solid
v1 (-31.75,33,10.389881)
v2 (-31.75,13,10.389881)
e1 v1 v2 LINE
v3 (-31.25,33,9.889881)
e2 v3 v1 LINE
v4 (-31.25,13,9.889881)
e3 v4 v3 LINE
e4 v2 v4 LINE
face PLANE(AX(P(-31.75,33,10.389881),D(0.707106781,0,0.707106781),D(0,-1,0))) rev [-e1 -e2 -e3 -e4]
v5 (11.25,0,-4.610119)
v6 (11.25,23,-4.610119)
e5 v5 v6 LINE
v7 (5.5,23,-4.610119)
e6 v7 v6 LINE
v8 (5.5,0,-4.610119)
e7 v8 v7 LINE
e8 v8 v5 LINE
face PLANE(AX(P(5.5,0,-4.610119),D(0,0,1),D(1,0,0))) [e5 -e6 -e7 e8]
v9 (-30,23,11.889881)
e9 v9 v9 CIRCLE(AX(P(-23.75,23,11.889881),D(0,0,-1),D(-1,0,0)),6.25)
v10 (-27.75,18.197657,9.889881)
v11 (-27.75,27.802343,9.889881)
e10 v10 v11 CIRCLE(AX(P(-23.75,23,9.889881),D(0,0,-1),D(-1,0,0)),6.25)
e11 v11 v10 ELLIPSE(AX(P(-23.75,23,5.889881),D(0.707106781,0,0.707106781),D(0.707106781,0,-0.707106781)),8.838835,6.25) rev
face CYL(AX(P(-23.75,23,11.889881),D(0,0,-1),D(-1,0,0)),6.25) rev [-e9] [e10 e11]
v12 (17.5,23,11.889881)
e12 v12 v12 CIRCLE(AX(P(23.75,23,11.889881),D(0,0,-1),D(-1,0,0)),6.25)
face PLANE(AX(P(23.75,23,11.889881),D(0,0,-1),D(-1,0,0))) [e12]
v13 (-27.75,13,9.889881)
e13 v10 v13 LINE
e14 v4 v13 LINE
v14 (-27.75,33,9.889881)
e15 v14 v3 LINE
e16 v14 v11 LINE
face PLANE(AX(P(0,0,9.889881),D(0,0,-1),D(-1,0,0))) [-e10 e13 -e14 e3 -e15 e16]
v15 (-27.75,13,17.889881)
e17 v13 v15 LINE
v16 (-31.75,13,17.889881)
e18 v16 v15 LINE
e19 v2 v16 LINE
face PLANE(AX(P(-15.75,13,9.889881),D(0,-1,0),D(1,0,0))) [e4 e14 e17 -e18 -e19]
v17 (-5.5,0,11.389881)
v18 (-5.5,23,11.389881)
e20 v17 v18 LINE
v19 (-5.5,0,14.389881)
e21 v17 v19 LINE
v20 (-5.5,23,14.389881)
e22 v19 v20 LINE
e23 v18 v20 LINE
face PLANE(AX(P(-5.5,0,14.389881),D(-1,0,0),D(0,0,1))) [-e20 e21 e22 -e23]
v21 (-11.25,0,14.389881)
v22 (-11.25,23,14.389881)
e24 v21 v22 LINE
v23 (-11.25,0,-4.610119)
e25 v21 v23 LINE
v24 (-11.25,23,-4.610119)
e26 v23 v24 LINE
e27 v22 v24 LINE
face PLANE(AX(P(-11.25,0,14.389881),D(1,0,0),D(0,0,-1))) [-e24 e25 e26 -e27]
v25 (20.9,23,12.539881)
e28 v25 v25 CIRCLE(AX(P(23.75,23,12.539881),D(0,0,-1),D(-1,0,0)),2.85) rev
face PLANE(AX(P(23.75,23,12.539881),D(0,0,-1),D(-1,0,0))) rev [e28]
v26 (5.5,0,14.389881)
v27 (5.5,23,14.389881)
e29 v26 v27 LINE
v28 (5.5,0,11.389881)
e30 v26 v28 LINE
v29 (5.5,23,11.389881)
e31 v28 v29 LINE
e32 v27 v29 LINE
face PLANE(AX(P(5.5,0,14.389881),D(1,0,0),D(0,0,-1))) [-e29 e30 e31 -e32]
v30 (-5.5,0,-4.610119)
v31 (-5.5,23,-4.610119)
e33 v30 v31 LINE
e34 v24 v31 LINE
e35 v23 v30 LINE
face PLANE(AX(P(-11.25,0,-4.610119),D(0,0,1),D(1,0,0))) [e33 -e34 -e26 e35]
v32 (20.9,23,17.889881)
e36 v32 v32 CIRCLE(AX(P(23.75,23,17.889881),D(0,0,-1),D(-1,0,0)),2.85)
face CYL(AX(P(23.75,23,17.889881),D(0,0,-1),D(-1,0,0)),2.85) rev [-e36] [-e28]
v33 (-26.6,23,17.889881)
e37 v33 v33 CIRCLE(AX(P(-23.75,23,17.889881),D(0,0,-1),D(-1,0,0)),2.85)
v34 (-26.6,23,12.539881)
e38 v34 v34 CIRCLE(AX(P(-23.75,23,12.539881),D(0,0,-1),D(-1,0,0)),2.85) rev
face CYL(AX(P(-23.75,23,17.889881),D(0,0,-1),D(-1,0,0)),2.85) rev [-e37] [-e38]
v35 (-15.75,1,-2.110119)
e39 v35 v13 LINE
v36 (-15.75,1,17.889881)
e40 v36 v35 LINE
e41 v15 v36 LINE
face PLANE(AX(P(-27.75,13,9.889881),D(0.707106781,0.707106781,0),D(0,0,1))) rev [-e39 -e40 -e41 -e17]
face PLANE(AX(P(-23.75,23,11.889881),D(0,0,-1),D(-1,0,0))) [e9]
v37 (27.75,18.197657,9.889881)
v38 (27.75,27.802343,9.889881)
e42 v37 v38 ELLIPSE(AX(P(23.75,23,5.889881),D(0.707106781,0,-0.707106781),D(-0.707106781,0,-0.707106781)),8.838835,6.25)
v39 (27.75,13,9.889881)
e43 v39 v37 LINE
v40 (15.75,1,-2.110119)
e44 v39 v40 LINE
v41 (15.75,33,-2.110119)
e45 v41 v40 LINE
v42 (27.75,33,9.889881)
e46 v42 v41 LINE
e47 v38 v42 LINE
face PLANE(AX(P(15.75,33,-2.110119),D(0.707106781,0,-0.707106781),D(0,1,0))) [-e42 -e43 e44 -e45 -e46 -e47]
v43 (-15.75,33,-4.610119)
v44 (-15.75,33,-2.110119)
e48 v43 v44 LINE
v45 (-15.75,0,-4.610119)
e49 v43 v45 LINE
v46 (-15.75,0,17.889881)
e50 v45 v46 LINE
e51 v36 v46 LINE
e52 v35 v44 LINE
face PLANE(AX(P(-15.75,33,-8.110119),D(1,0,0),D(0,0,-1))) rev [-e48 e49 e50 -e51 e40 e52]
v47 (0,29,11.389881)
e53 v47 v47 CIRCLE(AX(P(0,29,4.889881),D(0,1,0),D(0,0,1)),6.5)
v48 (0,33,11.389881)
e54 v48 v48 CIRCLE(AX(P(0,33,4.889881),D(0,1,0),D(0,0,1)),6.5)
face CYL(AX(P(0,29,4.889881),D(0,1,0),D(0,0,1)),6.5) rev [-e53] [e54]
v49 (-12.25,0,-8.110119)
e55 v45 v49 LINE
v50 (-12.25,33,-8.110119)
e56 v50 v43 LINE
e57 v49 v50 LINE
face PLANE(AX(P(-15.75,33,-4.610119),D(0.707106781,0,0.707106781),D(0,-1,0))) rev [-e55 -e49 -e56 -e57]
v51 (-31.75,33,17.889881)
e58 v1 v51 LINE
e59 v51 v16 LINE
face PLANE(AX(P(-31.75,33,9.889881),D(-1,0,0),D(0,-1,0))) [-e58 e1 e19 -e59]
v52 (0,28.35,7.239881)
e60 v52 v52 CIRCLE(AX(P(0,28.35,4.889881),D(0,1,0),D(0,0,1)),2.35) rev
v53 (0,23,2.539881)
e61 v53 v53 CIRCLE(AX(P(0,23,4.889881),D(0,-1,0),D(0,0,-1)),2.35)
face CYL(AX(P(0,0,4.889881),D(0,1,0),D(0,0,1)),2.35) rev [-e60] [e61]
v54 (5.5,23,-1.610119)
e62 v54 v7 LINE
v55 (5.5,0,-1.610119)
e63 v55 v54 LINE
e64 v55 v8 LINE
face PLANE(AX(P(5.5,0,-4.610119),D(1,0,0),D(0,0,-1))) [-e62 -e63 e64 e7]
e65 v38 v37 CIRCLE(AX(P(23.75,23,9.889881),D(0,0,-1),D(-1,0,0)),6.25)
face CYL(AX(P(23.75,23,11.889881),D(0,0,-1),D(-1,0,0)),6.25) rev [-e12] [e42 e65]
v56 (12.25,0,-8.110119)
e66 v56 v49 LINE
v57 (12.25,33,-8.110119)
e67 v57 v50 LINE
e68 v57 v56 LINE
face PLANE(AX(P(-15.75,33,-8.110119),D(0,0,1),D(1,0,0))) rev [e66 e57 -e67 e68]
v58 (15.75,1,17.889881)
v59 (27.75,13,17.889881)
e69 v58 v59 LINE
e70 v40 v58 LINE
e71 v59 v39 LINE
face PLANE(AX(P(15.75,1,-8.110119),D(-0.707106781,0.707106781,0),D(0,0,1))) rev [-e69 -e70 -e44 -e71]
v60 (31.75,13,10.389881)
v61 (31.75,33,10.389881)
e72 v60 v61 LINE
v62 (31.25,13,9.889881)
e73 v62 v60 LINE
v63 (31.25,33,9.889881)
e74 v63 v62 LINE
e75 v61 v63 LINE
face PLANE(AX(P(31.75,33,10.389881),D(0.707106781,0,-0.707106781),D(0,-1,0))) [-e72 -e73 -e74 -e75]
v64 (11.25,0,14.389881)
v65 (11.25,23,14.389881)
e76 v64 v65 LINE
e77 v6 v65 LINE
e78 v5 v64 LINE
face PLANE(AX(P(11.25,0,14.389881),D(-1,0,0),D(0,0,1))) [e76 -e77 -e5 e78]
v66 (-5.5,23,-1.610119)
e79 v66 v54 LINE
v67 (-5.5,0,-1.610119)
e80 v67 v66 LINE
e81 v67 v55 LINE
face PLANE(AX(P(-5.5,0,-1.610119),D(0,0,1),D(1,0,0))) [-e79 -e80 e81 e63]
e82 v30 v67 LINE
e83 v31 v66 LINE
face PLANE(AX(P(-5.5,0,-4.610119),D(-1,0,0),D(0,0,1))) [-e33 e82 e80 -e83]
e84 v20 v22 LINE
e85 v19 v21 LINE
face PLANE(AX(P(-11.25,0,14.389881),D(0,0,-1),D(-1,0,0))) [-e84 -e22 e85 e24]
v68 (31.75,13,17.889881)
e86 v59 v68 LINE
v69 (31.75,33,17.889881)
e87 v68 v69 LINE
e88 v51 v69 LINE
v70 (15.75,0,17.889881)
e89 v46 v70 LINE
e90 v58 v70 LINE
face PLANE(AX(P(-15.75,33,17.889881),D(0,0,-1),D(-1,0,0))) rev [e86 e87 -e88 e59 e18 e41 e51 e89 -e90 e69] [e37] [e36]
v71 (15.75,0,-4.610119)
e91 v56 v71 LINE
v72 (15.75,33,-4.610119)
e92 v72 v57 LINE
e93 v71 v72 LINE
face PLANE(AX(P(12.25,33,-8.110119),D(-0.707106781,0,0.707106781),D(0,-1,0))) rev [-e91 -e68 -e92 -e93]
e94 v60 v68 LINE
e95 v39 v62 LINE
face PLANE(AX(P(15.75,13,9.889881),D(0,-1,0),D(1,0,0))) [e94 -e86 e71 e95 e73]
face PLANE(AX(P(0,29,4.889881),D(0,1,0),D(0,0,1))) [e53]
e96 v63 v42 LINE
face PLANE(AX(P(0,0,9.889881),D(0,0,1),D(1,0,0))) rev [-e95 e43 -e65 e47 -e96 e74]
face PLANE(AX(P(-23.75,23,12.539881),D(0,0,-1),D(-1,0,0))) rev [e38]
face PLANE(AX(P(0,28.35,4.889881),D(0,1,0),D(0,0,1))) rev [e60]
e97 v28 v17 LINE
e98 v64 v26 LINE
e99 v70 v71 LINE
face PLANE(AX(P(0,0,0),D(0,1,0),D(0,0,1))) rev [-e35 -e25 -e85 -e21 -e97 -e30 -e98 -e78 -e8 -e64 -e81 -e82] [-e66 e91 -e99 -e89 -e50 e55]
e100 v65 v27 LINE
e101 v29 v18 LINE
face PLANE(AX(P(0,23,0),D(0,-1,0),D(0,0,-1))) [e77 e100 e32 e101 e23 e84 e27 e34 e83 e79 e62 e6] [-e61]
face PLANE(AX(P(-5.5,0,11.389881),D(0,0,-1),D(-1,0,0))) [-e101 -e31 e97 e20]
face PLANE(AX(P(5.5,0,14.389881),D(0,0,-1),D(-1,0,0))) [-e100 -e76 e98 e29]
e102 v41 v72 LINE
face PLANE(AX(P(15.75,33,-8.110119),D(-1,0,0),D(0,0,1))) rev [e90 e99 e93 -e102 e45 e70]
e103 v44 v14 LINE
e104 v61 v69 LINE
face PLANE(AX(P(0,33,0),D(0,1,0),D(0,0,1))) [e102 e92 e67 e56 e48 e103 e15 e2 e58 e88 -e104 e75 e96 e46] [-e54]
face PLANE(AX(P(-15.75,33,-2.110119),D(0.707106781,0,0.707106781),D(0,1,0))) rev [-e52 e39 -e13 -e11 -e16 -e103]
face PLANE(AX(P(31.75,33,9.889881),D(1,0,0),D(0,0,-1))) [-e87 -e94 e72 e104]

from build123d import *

# Parameters (mm, degrees)
SKETCH1_W           = 31.5
SKETCH1_H           = 26
BOSS_EXTRUDE1_DEPTH = 33
SKETCH8_W           = 16
SKETCH8_H           = 20
BOSS_EXTRUDE2_DEPTH = 8
CUT_EXTRUDE1_START  = 10
CUT_EXTRUDE1_DEPTH  = 40.164116391
SKETCH3_R           = 2.85
CUT_EXTRUDE2_DEPTH  = 50.204293512
SKETCH6_R           = 6.25
CUT_EXTRUDE5_DEPTH  = 2
SKETCH4_R           = 2.35
CUT_EXTRUDE3_DEPTH  = 50.164116391
SKETCH5_R           = 6.5
CUT_EXTRUDE4_DEPTH  = 4
CHAMFER1_SIZE       = 3.5
CHAMFER3_SIZE       = 0.5
CHAMFER4_SIZE       = 12
CHAMFER5_SIZE       = 12
SKETCH10_R          = 4.428091906
BOSS_EXTRUDE4_DEPTH = 0.65
SKETCH11_R          = 4.527005536
SKETCH11_R_2        = 4.450513295
BOSS_EXTRUDE5_DEPTH = 0.65


with BuildPart() as part:
    # Sketch1 → Boss-Extrude1 (new body)
    with BuildSketch(Plane(origin=(0, 0, 0), x_dir=(1, 0, 0), z_dir=(0, 1, 0))):
        with Locations((0, -4.889880952)):
            Rectangle(SKETCH1_W, SKETCH1_H)
    extrude(amount=BOSS_EXTRUDE1_DEPTH)

    # Sketch8 → Boss-Extrude2 (add)
    with BuildSketch(Plane.XY.offset(17.889880952)):
        with Locations((23.75, 23)):
            Rectangle(SKETCH8_W, SKETCH8_H)
        with Locations((-23.75, 23)):
            Rectangle(SKETCH8_W, SKETCH8_H)
    extrude(amount=-BOSS_EXTRUDE2_DEPTH)

    # Sketch2 → Cut-Extrude1 (cut, through all)
    with BuildSketch(Plane.XZ.offset(-33).offset(CUT_EXTRUDE1_START)):
        Polygon((-11.25, 14.389880952), (-5.5, 14.389880952), (-5.5, 11.389880952), (5.5, 11.389880952), (5.5, 14.389880952), (11.25, 14.389880952), (11.25, -4.610119048), (5.5, -4.610119048), (5.5, -1.610119048), (-5.5, -1.610119048), (-5.5, -4.610119048), (-11.25, -4.610119048), align=None)
    extrude(amount=CUT_EXTRUDE1_DEPTH, mode=Mode.SUBTRACT)

    # Sketch3 → Cut-Extrude2 (cut, through all)
    with BuildSketch(Plane(origin=(0, 0, 9.889880952), x_dir=(-1, 0, 0), z_dir=(0, 0, -1))):
        with Locations((-23.75, 23)):
            Circle(SKETCH3_R)
        with Locations((23.75, 23)):
            Circle(SKETCH3_R)
    extrude(amount=-CUT_EXTRUDE2_DEPTH, mode=Mode.SUBTRACT)

    # Sketch6 → Cut-Extrude5 (cut)
    with BuildSketch(Plane(origin=(0, 0, 9.889880952), x_dir=(-1, 0, 0), z_dir=(0, 0, -1))):
        with Locations((-23.75, 23)):
            Circle(SKETCH6_R)
        with Locations((23.75, 23)):
            Circle(SKETCH6_R)
    extrude(amount=-CUT_EXTRUDE5_DEPTH, mode=Mode.SUBTRACT)

    # Sketch4 → Cut-Extrude3 (cut, through all)
    with BuildSketch(Plane(origin=(0, 33, 0), x_dir=(1, 0, 0), z_dir=(0, 1, 0))):
        with Locations(Location((0, -4.889880952, 0), (0, 0, 270))):
            Circle(SKETCH4_R)
    extrude(amount=-CUT_EXTRUDE3_DEPTH, mode=Mode.SUBTRACT)

    # Sketch5 → Cut-Extrude4 (cut)
    with BuildSketch(Plane(origin=(0, 33, 0), x_dir=(1, 0, 0), z_dir=(0, 1, 0))):
        with Locations(Location((0, -4.889880952, 0), (0, 0, 270))):
            Circle(SKETCH5_R)
    extrude(amount=-CUT_EXTRUDE4_DEPTH, mode=Mode.SUBTRACT)

    # Chamfer1
    chamfer1_edges = [part.edges().sort_by_distance(p)[0] for p in [
        (-15.75, 16.5, -8.110119048),
        (15.75, 16.5, -8.110119048),
    ]]
    chamfer(chamfer1_edges, length=CHAMFER1_SIZE)

    # Chamfer3
    chamfer3_edges = [part.edges().sort_by_distance(p)[0] for p in [
        (31.75, 23, 9.889880952),
        (-31.75, 23, 9.889880952),
    ]]
    chamfer(chamfer3_edges, length=CHAMFER3_SIZE)

    # Chamfer4
    # the kernel refuses this chamfer: 12 mm, written as the material it adds along each edge
    with BuildSketch(Plane(origin=(15.75, 13, 9.889880952), x_dir=(-0.027495876610586348, 0, -0.9996219169112968), z_dir=(0, 1, 0))) as chamfer4_piece_1_section:
        Polygon((CHAMFER4_SIZE * 0.999621916911, -CHAMFER4_SIZE * 0.0274958766106), (-CHAMFER4_SIZE * 0.0274958766106, -CHAMFER4_SIZE * 0.999621916911), (0, 0), align=None)
    chamfer4_piece_1 = extrude(amount=20, mode=Mode.PRIVATE)
    chamfer4_piece_1 = chamfer4_piece_1 - Plane(origin=(23.75, 23, -0.26462775), x_dir=(-1, 0, 0), z_dir=(0, 0, -1)) * Cylinder(6.25, 88, mode=Mode.PRIVATE)
    add(chamfer4_piece_1)
    with BuildSketch(Plane(origin=(-15.75, 13, 9.889880952), x_dir=(-0.9996219169112969, 0, 0.027495876610586348), z_dir=(0, 1, 0))) as chamfer4_piece_2_section:
        Polygon((CHAMFER4_SIZE * 0.999621916911, -CHAMFER4_SIZE * 0.0274958766106), (-CHAMFER4_SIZE * 0.0274958766106, -CHAMFER4_SIZE * 0.999621916911), (0, 0), align=None)
    chamfer4_piece_2 = extrude(amount=20, mode=Mode.PRIVATE)
    chamfer4_piece_2 = chamfer4_piece_2 - Plane(origin=(-23.75, 23, 8.187920604), x_dir=(-1, 0, 0), z_dir=(0, 0, -1)) * Cylinder(6.25, 88, mode=Mode.PRIVATE)
    add(chamfer4_piece_2)

    # Chamfer5
    chamfer5_edges = [part.edges().sort_by_distance(p)[0] for p in [
        (-15.75, 13, 7.889880952),
        (15.75, 13, 7.889880952),
    ]]
    chamfer(chamfer5_edges, length=CHAMFER5_SIZE)

    # Sketch10 → Boss-Extrude4 (add)
    with BuildSketch(Plane(origin=(0, 29, 0), x_dir=(1, 0, 0), z_dir=(0, 1, 0))):
        with Locations((0, -4.889880952)):
            Circle(SKETCH10_R)
    extrude(amount=-BOSS_EXTRUDE4_DEPTH)

    # Sketch11 → Boss-Extrude5 (add)
    with BuildSketch(Plane(origin=(0, 0, 11.889880952), x_dir=(-1, 0, 0), z_dir=(0, 0, -1))):
        with Locations((-23.75, 23)):
            Circle(SKETCH11_R)
        with Locations((23.75, 23)):
            Circle(SKETCH11_R_2)
    extrude(amount=-BOSS_EXTRUDE5_DEPTH)


solid = part.part
